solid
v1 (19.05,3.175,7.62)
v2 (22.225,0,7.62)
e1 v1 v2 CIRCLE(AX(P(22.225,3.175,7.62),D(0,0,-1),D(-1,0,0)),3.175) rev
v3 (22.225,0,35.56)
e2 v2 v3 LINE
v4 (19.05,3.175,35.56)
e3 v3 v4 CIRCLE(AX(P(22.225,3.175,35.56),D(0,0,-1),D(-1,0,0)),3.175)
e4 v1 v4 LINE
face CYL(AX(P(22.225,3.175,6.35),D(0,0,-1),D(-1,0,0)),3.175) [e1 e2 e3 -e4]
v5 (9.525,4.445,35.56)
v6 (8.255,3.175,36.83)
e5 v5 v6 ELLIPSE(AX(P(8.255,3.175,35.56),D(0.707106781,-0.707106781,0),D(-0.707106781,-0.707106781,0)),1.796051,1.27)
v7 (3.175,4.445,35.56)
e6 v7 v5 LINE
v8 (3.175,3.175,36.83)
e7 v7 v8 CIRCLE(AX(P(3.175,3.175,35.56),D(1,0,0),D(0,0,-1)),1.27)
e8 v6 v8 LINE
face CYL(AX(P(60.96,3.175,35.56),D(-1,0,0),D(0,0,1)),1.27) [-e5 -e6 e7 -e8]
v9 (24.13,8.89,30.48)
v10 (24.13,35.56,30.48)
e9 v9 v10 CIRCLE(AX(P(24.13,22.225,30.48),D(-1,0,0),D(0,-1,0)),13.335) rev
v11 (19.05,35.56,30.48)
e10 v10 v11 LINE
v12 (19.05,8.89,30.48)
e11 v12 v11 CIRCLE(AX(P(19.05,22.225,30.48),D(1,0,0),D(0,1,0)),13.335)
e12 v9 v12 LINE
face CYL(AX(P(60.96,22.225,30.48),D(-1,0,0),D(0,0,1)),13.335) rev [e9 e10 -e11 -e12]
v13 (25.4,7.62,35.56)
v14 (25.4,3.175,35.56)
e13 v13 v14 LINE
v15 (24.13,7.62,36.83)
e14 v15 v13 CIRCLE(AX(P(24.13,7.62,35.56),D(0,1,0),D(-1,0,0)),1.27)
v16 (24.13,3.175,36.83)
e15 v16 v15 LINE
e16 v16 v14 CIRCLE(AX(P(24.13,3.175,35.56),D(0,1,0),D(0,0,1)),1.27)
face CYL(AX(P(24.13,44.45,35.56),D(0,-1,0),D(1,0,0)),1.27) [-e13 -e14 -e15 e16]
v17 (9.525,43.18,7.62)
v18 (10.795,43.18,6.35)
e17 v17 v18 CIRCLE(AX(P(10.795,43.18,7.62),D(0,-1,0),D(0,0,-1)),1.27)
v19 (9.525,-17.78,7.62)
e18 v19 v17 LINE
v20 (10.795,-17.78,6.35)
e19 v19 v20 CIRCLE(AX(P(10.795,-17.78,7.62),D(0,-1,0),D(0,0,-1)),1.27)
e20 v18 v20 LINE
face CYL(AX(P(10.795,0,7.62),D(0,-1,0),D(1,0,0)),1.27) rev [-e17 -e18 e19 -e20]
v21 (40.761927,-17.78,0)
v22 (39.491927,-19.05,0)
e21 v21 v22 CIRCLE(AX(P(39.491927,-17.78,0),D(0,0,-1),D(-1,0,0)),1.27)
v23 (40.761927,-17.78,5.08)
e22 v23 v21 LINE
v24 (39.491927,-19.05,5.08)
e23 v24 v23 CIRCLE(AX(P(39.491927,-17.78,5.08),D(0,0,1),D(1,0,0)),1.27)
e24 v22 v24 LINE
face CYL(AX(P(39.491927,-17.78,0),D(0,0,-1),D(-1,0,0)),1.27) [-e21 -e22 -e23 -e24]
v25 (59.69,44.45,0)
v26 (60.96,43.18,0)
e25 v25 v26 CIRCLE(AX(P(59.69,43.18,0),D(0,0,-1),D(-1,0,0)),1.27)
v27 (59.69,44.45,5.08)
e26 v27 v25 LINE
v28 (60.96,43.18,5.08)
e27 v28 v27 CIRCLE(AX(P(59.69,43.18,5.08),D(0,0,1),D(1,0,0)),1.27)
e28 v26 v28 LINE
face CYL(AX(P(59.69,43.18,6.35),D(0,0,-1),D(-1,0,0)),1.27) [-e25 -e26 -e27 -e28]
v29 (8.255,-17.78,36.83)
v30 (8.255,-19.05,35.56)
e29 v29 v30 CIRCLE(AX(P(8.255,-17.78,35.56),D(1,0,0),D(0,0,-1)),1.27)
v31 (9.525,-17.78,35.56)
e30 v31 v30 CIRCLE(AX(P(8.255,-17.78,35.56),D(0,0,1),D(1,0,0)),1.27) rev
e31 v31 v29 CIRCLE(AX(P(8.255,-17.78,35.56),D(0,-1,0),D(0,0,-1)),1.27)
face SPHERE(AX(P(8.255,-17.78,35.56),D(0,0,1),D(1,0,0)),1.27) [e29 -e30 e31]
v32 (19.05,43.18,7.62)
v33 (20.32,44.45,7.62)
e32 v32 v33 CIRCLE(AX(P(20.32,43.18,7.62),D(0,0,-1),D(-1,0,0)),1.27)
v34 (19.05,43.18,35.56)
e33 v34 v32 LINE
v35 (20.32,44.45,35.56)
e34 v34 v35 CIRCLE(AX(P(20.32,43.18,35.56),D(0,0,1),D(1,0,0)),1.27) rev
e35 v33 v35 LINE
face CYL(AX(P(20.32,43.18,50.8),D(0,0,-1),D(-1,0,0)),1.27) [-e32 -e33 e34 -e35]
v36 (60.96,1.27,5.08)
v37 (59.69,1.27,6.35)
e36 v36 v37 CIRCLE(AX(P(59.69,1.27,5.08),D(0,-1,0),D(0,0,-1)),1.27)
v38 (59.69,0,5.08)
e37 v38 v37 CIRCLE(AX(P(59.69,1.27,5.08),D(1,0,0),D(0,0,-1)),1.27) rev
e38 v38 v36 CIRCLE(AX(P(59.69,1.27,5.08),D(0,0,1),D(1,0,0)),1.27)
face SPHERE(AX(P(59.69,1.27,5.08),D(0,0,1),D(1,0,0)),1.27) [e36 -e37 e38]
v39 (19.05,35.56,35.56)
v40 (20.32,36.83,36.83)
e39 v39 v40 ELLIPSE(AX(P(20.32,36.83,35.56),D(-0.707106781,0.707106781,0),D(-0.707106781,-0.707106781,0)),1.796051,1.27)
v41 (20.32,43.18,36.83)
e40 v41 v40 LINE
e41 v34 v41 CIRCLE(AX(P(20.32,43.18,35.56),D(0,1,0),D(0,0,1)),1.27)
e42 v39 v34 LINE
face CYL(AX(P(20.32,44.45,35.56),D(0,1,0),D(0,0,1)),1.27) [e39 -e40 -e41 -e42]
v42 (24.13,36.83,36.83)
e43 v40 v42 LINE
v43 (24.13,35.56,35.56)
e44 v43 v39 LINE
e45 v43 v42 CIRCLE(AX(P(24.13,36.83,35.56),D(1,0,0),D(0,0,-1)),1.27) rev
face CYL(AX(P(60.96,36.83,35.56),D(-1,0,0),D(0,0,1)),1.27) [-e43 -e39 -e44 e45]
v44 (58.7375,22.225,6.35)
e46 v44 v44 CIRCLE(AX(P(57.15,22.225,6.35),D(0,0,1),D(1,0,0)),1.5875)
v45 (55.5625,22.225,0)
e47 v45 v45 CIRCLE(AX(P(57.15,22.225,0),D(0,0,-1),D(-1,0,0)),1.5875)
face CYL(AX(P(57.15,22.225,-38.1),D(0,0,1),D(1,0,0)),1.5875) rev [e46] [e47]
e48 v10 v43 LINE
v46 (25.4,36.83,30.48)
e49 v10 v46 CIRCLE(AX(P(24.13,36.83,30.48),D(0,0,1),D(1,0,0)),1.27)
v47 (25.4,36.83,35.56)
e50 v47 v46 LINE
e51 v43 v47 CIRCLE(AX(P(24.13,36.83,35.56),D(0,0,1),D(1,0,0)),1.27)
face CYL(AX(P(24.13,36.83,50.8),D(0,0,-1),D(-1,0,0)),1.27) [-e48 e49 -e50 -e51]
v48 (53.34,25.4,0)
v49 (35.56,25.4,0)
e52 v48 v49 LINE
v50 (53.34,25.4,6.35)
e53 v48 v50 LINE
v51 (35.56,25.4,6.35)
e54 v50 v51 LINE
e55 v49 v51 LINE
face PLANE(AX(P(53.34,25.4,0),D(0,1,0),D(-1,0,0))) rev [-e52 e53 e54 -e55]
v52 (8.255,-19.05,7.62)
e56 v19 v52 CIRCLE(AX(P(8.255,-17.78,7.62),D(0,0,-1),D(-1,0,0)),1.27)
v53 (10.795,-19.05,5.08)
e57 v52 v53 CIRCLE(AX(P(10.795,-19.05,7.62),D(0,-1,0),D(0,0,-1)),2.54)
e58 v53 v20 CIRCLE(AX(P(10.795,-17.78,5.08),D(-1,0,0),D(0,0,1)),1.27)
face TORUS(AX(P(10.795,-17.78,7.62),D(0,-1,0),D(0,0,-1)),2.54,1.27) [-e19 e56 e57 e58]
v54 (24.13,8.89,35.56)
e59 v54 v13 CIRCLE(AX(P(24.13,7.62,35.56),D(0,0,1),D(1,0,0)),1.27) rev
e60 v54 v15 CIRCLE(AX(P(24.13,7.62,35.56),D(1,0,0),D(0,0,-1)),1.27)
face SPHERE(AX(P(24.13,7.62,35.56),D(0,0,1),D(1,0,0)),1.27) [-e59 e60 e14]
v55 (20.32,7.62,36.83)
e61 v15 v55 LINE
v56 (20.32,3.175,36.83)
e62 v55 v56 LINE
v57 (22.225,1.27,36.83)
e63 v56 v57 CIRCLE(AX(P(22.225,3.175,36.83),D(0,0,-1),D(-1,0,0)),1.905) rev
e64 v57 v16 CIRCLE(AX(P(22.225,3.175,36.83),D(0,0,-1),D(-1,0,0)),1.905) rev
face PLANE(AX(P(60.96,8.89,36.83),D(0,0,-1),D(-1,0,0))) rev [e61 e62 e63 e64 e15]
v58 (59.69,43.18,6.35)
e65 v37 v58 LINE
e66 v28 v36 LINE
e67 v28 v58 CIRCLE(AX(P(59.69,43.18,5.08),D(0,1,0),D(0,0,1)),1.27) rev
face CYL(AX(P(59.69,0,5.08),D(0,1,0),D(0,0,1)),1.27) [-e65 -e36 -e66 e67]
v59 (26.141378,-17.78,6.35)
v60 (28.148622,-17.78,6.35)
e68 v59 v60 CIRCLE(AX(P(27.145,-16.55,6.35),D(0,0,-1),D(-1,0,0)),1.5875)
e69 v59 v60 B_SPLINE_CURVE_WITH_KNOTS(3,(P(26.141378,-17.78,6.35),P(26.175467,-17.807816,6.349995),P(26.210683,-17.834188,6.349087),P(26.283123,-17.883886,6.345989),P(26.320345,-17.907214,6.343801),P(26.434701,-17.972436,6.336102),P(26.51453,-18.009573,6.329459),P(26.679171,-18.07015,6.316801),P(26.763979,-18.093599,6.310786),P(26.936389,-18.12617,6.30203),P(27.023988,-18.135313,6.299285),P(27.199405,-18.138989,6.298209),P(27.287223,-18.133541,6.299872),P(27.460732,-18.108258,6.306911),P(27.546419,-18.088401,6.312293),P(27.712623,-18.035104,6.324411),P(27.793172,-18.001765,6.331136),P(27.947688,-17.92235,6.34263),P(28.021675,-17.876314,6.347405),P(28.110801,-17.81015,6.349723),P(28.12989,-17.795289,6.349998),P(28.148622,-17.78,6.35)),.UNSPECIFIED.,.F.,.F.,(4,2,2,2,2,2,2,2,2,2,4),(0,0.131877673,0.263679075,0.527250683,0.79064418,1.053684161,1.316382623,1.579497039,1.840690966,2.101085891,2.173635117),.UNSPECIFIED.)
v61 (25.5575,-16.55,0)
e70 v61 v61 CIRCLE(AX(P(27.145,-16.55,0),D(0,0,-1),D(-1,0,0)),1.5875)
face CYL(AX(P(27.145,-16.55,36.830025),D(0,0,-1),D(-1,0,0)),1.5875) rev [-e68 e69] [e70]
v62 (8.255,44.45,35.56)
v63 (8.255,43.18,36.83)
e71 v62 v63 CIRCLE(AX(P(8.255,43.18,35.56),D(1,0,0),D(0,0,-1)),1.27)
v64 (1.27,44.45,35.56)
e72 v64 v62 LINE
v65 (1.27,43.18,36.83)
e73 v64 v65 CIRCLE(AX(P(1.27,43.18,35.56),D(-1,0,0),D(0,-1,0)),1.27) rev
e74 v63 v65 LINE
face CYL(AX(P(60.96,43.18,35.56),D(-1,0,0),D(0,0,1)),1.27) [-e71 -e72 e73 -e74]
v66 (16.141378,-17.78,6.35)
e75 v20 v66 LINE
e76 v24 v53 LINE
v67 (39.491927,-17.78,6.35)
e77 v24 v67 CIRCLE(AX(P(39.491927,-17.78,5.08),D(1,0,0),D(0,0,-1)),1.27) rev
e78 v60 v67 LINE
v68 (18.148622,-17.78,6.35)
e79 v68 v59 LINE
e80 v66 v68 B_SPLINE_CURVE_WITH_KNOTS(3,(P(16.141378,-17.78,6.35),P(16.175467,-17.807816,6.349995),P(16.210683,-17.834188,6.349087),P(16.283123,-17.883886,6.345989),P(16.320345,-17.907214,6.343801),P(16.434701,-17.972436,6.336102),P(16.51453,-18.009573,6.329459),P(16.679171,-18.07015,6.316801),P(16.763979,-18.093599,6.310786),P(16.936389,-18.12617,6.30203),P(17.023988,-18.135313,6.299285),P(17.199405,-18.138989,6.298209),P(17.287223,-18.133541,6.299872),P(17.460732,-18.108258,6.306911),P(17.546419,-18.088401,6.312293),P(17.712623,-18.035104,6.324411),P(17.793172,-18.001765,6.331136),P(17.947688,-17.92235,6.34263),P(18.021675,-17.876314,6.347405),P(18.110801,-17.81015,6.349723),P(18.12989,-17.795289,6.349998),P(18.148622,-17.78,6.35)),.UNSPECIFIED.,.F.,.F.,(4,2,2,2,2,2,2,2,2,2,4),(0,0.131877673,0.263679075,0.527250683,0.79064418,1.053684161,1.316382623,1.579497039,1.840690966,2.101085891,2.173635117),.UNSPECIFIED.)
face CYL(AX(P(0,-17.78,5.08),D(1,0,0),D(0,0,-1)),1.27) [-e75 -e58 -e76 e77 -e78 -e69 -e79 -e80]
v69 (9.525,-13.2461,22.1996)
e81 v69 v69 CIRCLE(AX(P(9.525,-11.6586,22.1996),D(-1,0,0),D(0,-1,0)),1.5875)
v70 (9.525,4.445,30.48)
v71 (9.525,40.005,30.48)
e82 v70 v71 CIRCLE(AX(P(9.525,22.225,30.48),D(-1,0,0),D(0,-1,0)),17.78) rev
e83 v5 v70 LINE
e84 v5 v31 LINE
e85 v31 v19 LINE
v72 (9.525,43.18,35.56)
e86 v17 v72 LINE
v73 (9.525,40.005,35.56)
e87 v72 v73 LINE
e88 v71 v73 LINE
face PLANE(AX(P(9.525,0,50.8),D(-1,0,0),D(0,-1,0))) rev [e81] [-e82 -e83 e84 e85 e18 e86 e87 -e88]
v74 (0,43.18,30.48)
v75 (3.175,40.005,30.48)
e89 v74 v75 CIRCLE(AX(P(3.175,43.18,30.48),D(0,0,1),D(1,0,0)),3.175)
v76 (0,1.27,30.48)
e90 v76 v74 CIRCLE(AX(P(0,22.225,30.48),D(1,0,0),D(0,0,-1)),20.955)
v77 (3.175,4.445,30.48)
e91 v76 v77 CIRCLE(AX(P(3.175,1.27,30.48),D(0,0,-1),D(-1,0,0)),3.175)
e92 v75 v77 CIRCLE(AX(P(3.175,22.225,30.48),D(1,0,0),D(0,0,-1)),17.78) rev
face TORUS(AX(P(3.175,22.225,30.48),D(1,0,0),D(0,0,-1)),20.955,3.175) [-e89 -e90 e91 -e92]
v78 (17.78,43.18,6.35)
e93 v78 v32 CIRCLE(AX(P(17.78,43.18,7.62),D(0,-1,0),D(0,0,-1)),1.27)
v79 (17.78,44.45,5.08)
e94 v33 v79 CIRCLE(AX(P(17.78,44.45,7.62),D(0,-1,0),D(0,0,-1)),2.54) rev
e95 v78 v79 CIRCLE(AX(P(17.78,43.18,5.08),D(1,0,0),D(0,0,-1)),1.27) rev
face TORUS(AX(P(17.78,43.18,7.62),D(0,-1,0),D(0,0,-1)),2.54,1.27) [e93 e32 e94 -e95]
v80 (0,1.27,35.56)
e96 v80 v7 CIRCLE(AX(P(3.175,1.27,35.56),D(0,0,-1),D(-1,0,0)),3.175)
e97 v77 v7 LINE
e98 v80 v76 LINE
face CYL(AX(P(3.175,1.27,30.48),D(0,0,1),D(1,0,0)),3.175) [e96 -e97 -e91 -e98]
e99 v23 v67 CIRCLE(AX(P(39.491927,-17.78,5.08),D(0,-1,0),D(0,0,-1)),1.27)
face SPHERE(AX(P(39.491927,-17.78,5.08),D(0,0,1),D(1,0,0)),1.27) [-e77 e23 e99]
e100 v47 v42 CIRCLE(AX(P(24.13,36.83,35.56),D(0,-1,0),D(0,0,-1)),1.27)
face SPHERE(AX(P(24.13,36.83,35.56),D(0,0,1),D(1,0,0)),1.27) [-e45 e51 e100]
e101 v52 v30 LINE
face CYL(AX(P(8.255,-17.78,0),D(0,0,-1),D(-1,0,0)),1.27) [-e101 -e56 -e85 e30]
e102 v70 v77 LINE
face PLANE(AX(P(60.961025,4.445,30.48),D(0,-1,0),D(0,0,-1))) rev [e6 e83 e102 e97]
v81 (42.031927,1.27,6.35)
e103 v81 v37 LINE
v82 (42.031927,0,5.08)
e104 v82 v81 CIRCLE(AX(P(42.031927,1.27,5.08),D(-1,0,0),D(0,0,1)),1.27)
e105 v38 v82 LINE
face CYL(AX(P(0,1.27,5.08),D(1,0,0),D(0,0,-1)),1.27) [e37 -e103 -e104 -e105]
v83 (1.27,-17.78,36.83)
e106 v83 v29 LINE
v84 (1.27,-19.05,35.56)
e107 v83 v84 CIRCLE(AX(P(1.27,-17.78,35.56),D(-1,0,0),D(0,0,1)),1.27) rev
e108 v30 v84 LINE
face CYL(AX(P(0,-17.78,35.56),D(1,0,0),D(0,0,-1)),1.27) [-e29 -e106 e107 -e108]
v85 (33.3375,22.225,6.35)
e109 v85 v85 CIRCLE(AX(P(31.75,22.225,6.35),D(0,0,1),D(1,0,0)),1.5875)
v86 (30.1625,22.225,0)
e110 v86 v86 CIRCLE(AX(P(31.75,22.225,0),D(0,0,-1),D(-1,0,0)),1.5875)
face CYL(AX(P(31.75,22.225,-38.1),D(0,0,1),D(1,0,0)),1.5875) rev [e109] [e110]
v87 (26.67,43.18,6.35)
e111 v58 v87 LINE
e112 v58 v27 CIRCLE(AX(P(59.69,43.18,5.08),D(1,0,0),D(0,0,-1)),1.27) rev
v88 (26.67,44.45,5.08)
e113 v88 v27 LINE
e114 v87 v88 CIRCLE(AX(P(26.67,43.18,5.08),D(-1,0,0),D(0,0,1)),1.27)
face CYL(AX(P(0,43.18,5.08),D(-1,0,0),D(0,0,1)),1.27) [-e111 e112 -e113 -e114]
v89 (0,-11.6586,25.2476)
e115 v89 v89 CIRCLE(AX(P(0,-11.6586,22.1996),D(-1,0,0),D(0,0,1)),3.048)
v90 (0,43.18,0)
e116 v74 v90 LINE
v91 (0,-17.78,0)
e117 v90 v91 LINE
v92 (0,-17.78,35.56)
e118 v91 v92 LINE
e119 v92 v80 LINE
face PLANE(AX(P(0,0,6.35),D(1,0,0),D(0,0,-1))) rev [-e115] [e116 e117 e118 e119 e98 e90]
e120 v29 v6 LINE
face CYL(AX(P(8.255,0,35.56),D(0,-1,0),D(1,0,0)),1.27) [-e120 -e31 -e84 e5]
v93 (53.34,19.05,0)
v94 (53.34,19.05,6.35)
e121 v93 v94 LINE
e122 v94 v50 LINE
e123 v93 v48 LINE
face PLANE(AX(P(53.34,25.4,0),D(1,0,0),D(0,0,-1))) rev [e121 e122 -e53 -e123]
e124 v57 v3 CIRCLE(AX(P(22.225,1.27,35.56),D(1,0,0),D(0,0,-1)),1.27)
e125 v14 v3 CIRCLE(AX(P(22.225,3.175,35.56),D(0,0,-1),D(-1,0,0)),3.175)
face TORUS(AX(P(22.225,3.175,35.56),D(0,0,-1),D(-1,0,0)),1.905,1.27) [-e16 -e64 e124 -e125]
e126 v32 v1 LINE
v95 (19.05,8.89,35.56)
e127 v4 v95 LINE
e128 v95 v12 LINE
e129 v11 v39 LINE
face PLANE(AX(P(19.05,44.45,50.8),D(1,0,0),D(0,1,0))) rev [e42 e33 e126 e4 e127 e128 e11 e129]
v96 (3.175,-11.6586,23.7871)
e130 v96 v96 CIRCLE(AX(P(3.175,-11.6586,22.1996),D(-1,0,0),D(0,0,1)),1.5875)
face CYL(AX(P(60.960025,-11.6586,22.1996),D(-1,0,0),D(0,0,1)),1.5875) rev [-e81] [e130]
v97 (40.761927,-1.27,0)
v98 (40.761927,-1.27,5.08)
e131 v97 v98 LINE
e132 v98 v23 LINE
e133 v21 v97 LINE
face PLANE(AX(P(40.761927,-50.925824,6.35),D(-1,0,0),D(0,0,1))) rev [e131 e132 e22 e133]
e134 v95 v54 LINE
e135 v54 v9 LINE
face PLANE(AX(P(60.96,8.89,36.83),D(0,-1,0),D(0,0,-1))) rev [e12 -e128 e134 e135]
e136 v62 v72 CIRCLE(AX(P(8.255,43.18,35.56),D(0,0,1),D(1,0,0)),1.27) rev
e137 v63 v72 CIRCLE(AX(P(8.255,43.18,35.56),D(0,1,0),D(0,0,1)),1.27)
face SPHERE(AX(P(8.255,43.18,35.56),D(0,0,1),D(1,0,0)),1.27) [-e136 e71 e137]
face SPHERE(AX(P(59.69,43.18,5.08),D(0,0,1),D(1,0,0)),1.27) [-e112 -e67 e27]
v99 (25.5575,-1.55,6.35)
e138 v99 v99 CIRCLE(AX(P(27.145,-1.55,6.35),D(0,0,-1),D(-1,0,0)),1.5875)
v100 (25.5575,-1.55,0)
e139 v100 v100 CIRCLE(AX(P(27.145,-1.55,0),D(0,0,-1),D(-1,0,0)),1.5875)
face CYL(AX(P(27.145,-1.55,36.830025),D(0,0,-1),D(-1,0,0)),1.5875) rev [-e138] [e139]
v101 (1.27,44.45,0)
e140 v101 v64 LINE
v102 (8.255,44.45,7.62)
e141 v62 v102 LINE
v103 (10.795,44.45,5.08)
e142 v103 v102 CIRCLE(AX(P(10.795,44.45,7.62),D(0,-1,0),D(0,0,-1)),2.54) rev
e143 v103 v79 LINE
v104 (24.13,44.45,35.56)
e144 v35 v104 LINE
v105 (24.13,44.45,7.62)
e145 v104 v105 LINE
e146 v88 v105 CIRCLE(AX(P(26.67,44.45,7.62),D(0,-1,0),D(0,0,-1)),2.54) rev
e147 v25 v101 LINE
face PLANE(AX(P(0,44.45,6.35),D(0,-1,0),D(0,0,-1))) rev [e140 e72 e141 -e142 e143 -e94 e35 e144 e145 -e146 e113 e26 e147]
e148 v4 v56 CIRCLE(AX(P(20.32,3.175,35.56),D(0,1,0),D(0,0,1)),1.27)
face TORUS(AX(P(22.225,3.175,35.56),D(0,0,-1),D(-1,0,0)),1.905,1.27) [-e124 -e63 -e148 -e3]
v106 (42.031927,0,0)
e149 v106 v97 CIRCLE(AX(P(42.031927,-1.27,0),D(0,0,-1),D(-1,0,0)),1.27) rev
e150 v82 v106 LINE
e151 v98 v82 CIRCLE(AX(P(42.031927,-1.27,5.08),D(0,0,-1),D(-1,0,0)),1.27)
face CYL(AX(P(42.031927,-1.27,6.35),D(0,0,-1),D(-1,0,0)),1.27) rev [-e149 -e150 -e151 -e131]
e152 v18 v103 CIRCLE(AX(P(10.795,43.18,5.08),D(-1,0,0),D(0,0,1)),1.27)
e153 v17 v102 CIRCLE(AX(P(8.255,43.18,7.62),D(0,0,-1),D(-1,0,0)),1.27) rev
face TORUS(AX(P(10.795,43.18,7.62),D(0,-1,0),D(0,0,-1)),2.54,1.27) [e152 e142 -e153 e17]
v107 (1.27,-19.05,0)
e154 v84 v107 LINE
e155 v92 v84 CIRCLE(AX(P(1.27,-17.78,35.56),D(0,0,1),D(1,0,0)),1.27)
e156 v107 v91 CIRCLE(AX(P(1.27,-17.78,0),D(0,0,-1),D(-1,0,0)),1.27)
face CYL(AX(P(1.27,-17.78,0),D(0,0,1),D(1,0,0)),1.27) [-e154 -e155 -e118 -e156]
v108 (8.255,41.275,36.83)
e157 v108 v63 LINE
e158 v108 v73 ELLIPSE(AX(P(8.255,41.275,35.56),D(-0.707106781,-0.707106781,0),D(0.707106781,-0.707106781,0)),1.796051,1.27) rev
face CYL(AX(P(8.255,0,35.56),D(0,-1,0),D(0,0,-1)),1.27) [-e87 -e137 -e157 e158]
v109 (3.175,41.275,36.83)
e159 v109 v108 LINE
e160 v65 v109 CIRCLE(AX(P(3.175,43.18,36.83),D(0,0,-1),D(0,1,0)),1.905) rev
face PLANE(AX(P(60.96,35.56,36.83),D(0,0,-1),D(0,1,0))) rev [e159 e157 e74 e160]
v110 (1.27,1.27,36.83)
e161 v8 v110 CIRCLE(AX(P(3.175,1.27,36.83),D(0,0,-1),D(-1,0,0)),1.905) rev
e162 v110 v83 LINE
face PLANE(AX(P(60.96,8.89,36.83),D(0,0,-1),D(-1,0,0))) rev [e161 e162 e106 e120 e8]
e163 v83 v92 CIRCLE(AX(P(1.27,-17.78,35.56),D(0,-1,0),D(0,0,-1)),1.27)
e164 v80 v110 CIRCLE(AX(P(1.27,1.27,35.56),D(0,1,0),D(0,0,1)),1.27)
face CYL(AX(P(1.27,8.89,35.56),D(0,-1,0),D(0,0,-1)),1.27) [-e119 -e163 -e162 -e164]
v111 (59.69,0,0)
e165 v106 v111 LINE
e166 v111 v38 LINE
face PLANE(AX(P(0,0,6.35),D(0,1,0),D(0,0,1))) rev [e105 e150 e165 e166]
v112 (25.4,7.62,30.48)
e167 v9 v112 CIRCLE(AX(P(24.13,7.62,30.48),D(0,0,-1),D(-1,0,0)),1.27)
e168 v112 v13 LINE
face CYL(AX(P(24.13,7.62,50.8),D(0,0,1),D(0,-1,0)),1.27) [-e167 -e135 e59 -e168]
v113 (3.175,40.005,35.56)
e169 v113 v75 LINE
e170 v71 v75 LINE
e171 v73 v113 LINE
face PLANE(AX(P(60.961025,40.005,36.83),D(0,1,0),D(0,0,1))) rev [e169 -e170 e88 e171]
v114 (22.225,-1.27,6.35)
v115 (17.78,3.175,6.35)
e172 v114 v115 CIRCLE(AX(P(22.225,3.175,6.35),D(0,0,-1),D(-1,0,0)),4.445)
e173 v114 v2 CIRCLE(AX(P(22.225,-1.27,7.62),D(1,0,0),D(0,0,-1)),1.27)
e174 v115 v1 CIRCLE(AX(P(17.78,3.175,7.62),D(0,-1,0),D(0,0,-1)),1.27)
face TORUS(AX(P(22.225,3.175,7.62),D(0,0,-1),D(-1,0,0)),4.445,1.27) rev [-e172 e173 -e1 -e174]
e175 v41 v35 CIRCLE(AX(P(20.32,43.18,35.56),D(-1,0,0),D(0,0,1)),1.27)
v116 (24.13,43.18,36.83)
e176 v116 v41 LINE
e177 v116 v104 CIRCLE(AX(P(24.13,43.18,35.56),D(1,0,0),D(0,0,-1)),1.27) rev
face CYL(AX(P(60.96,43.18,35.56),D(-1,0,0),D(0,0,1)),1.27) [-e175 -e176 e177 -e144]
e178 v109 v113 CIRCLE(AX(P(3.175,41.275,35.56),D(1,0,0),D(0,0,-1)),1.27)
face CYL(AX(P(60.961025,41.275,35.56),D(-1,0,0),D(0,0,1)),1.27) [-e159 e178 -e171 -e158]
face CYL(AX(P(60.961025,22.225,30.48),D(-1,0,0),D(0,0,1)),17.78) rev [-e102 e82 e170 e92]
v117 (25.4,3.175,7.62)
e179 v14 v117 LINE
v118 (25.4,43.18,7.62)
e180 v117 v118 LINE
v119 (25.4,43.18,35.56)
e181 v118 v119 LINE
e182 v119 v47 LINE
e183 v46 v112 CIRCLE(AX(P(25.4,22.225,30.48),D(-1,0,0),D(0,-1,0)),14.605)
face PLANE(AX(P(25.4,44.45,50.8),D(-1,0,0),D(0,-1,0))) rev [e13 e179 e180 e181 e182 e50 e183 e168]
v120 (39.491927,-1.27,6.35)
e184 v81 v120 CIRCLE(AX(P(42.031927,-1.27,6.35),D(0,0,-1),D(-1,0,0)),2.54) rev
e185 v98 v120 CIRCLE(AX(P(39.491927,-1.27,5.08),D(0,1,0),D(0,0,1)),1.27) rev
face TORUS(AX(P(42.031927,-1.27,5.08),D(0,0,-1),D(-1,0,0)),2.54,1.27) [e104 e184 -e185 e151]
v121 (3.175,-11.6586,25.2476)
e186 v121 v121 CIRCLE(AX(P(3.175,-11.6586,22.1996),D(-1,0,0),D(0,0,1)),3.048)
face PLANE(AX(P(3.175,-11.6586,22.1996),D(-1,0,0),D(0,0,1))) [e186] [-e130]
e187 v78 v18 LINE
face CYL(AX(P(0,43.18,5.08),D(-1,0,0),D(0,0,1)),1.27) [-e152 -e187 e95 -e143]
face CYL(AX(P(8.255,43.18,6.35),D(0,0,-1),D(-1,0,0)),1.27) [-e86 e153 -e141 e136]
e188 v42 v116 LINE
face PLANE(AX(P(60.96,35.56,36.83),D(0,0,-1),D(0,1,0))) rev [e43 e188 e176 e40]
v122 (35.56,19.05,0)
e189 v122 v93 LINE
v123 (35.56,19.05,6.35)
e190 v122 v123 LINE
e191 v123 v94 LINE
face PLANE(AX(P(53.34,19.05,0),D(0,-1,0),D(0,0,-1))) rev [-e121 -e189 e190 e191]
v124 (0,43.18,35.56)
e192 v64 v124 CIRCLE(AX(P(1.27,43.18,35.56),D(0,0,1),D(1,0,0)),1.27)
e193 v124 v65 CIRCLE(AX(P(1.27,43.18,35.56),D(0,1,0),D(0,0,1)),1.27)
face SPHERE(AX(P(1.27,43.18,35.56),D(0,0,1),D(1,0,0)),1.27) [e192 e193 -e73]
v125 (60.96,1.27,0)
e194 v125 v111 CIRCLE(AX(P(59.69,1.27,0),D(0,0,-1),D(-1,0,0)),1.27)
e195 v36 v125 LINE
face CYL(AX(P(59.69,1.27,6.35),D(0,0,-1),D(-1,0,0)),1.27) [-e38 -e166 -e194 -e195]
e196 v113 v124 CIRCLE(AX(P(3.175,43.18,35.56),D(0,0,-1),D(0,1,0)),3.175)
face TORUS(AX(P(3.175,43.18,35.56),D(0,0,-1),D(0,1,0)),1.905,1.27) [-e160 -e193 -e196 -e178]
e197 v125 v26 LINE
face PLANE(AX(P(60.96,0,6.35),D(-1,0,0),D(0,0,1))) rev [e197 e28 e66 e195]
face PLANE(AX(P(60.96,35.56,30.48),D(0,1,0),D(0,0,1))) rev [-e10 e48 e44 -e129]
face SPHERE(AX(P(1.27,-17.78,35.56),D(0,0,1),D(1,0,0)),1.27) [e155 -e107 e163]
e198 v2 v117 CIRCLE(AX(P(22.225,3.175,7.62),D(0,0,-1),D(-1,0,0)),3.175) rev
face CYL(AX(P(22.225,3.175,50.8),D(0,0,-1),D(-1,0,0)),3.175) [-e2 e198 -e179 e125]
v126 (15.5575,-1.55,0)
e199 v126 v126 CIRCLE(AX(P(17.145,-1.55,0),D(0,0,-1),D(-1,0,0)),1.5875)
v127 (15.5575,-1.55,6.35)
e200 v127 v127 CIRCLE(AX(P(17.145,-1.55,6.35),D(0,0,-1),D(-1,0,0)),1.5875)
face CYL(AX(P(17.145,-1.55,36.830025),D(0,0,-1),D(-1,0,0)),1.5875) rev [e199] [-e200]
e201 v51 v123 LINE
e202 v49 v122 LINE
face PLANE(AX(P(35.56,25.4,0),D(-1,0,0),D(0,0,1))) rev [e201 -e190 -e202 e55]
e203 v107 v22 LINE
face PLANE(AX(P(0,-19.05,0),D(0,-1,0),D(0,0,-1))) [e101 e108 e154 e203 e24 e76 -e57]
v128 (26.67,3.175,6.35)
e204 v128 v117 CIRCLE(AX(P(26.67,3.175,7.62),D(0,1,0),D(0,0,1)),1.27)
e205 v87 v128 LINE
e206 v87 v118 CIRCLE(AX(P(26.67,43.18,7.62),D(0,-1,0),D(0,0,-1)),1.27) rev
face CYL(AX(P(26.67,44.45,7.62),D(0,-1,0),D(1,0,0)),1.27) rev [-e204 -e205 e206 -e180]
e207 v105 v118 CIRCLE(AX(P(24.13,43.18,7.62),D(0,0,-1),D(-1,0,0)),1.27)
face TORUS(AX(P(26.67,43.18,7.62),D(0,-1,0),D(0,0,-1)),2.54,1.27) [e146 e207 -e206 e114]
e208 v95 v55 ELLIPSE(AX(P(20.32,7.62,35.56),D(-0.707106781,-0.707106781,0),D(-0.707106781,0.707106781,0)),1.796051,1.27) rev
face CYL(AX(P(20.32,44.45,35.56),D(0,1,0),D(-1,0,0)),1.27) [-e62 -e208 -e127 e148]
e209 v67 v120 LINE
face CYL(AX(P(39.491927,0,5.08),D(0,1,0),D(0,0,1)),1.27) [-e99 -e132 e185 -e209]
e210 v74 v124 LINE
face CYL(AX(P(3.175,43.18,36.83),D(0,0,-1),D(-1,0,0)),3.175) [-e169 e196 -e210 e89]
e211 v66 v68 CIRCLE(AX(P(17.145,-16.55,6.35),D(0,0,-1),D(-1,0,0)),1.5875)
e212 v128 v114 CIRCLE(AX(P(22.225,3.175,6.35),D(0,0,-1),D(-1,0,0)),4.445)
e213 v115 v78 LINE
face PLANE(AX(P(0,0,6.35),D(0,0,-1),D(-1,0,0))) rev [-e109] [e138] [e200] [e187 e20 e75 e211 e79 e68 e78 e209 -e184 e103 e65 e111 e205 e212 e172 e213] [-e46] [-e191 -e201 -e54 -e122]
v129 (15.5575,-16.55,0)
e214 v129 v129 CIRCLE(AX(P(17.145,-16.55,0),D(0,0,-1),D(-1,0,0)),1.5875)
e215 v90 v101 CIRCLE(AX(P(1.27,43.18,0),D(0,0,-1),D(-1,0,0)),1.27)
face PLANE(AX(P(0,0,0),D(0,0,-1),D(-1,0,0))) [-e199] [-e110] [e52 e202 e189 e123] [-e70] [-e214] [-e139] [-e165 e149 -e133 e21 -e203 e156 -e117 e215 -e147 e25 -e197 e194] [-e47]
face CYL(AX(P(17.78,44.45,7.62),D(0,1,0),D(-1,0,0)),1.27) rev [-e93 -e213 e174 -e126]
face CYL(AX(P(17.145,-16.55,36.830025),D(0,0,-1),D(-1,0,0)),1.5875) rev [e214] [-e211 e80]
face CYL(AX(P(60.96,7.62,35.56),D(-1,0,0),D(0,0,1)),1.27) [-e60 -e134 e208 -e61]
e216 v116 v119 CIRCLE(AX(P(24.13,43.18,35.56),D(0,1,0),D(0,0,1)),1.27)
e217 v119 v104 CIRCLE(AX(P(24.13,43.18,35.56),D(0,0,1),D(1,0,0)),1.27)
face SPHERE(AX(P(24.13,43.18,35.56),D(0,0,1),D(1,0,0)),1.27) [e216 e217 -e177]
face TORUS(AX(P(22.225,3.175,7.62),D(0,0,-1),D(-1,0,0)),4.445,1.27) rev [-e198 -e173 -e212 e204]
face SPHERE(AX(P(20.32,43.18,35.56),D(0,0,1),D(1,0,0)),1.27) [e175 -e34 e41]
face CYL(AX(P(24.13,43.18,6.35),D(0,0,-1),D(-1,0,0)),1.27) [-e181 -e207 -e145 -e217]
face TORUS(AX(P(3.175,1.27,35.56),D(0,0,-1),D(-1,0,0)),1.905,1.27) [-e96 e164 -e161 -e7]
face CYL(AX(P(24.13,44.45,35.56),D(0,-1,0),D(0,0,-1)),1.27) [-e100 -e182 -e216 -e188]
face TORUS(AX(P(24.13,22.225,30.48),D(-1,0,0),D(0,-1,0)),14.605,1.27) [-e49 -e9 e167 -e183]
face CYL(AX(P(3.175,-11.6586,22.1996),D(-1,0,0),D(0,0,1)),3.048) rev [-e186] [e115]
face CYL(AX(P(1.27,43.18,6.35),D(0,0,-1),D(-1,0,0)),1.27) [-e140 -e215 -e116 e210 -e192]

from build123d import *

# Parameters (mm, degrees)
SKETCH1_W           = 60.96
SKETCH1_H           = 44.45
BOSS_EXTRUDE1_DEPTH = 6.35
SKETCH2_W           = 9.525
SKETCH2_H           = 44.45
SKETCH2_W_2         = 6.35
BOSS_EXTRUDE2_DEPTH = 44.45
CUT_EXTRUDE1_DEPTH  = 91.953637091
SKETCH4_R           = 1.5875
CUT_EXTRUDE2_DEPTH  = 44.45
SKETCH6_W           = 17.78
SKETCH6_H           = 6.35
CUT_EXTRUDE3_DEPTH  = 82.369247877
SKETCH7_W           = 9.525
SKETCH7_H           = 36.83
BOSS_EXTRUDE3_DEPTH = 19.05
SKETCH8_R           = 3.048
CUT_EXTRUDE4_DEPTH  = 3.175
SKETCH9_R           = 1.5875
CUT_EXTRUDE5_DEPTH  = 84.954588916
CUT_EXTRUDE6_REACH  = 85.955
SKETCH12_W          = 31.236927456
SKETCH12_H          = 6.35
BOSS_EXTRUDE4_DEPTH = 19.05
FILLET1_R           = 3.175
SKETCH11_R          = 1.5875
CUT_EXTRUDE7_DEPTH  = 84.954588916
FILLET3_R           = 3.175
FILLET4_R           = 1.27


# Some blends are built 0.0001 mm under size
with BuildPart() as part:
    # Sketch1 → Boss-Extrude1 (new body)
    with BuildSketch(Plane.XY):
        with Locations((30.48, 22.225)):
            Rectangle(SKETCH1_W, SKETCH1_H)
    extrude(amount=BOSS_EXTRUDE1_DEPTH)

    # Sketch2 → Boss-Extrude2 (add)
    with BuildSketch(Plane.XY.offset(6.35)):
        with Locations((4.7625, 22.225)):
            Rectangle(SKETCH2_W, SKETCH2_H)
        with Locations((22.225, 22.225)):
            Rectangle(SKETCH2_W_2, SKETCH2_H)
    extrude(amount=BOSS_EXTRUDE2_DEPTH)

    # Sketch3 → Cut-Extrude1 (cut, through all)
    with BuildSketch(Plane.ZY):
        with BuildLine():
            Line((30.48, 35.56), (36.83, 35.56))
            Line((36.83, 35.56), (36.83, 44.45))
            Line((36.83, 44.45), (50.8, 44.45))
            Line((50.8, 44.45), (50.8, 0))
            Line((50.8, 0), (36.83, 0))
            Line((36.83, 0), (36.83, 8.89))
            Line((36.83, 8.89), (30.48, 8.89))
            ThreePointArc((30.48, 8.89), (17.145, 22.225), (30.48, 35.56))
        make_face()
    extrude(amount=-CUT_EXTRUDE1_DEPTH, mode=Mode.SUBTRACT)

    # Sketch4 → Cut-Extrude2 (cut)
    with BuildSketch(Plane.XY.offset(6.35)):
        with Locations((57.15, 22.225)):
            Circle(SKETCH4_R)
        with Locations((31.75, 22.225)):
            Circle(SKETCH4_R)
    extrude(amount=-CUT_EXTRUDE2_DEPTH, mode=Mode.SUBTRACT)

    # Sketch6 → Cut-Extrude3 (cut, through all)
    with BuildSketch(Plane.XY.offset(6.35)):
        with Locations((44.45, 22.225)):
            Rectangle(SKETCH6_W, SKETCH6_H)
    extrude(amount=-CUT_EXTRUDE3_DEPTH, mode=Mode.SUBTRACT)

    # Sketch7 → Boss-Extrude3 (add)
    with BuildSketch(Plane.XZ):
        with Locations((4.7625, 18.415)):
            Rectangle(SKETCH7_W, SKETCH7_H)
    extrude(amount=BOSS_EXTRUDE3_DEPTH)

    # Sketch8 → Cut-Extrude4 (cut)
    with BuildSketch(Plane.ZY):
        with Locations((22.1996, -11.6586)):
            Circle(SKETCH8_R)
    extrude(amount=-CUT_EXTRUDE4_DEPTH, mode=Mode.SUBTRACT)

    # Sketch9 → Cut-Extrude5 (cut, through all)
    with BuildSketch(Plane.ZY):
        with Locations((22.1996, -11.6586)):
            Circle(SKETCH9_R)
    extrude(amount=-CUT_EXTRUDE5_DEPTH, mode=Mode.SUBTRACT)

    # Sketch10 → Cut-Extrude6 (cut, up to next)
    with BuildSketch(Plane.ZY, mode=Mode.PRIVATE) as cut_extrude6_sk1:
        with BuildLine():
            Line((30.48, 4.445), (36.83, 4.445))
            Line((36.83, 4.445), (36.83, 40.005))
            Line((36.83, 40.005), (30.48, 40.005))
            ThreePointArc((30.48, 40.005), (12.7, 22.225), (30.48, 4.445))
        make_face()
    cut_extrude6_tool1 = extrude(cut_extrude6_sk1.sketch, amount=-CUT_EXTRUDE6_REACH, mode=Mode.PRIVATE) & part.part
    add(cut_extrude6_tool1.solids().sort_by_distance((0, 22.225, 26.285194))[0], mode=Mode.SUBTRACT)

    # Sketch12 → Boss-Extrude4 (add)
    with BuildSketch(Plane.XZ):
        with Locations((25.143463728, 3.175)):
            Rectangle(SKETCH12_W, SKETCH12_H)
    extrude(amount=BOSS_EXTRUDE4_DEPTH)

    # Fillet1
    fillet1_edges = [part.edges().sort_by_distance(p)[0] for p in [
        (0, 40.005, 33.655),
        (0, 22.225, 12.7),
        (0, 4.445, 33.655),
    ]]
    fillet(fillet1_edges, radius=FILLET1_R)

    # Sketch11 → Cut-Extrude7 (cut, through all)
    with BuildSketch(Plane(origin=(0, 0, 0), x_dir=(-1, 0, 0), z_dir=(0, 0, -1))):
        with Locations((-27.145, -16.55)):
            Circle(SKETCH11_R)
        with Locations((-17.145, -16.55)):
            Circle(SKETCH11_R)
        with Locations((-17.145, -1.55)):
            Circle(SKETCH11_R)
        with Locations((-27.145, -1.55)):
            Circle(SKETCH11_R)
    extrude(amount=-CUT_EXTRUDE7_DEPTH, mode=Mode.SUBTRACT)

    # Fillet3
    fillet3_edges = [part.edges().sort_by_distance(p)[0] for p in [
        (19.05, 0, 21.59),
        (25.4, 0, 21.59),
    ]]
    fillet(fillet3_edges, radius=FILLET3_R - 0.0001)  # a hair under: the kernel refuses the full size

    # Fillet4
    # the kernel refuses this fillet: 1.27 mm, written as the material it adds along each edge
    with BuildSketch(Plane(origin=(19.05, 44.45, 6.35), x_dir=(-1, 0, 0), z_dir=(0, -1, 0)), Plane(origin=(25.4, 3.1749, 6.35), x_dir=(1, 0, 0), z_dir=(0, 1, 0))) as fillet4_piece_1:
        with BuildLine():
            CenterArc((FILLET4_R, -FILLET4_R), FILLET4_R, 90, 90)
            Line((0, -FILLET4_R), (0, 0))
            Line((0, 0), (FILLET4_R, 0))
        make_face()
    extrude(amount=41.2751)
    with BuildSketch(Plane(origin=(22.2249, 3.1749, 6.35), x_dir=(-1, 0, 0), z_dir=(0, 1, 0))) as fillet4_piece_2:
        with BuildLine():
            CenterArc((3.1749 + FILLET4_R, FILLET4_R), FILLET4_R, 180, 90)
            Line((3.1749, FILLET4_R), (3.1749, 0))
            Line((3.1749, 0), (3.1749 + FILLET4_R, 0))
        make_face()
    revolve(axis=Axis((22.2249, 3.1749, 6.35), (0, 0, 1)), revolution_arc=90)
    with BuildSketch(Plane(origin=(22.2251, 3.1749, 6.35), x_dir=(1, 0, 0), z_dir=(0, 1, 0))) as fillet4_piece_3:
        with BuildLine():
            CenterArc((3.1749 + FILLET4_R, -FILLET4_R), FILLET4_R, 90, 90)
            Line((3.1749, -FILLET4_R), (3.1749, 0))
            Line((3.1749, 0), (3.1749 + FILLET4_R, 0))
        make_face()
    revolve(axis=Axis((22.2251, 3.1749, 6.35), (0, 0, -1)), revolution_arc=90)
    with BuildSketch(Plane(origin=(40.761927456, 0, 6.35), x_dir=(1, 0, 0), z_dir=(0, 0, -1))) as fillet4_piece_4:
        with BuildLine():
            CenterArc((FILLET4_R, FILLET4_R), FILLET4_R, 180, 90)
            Line((0, FILLET4_R), (0, 0))
            Line((0, 0), (FILLET4_R, 0))
        make_face()
    extrude(amount=6.35)
    with BuildSketch(Plane(origin=(9.525, 44.45, 6.35), x_dir=(1, 0, 0), z_dir=(0, -1, 0))) as fillet4_piece_5:
        with BuildLine():
            CenterArc((FILLET4_R, FILLET4_R), FILLET4_R, 180, 90)
            Line((0, FILLET4_R), (0, 0))
            Line((0, 0), (FILLET4_R, 0))
        make_face()
    extrude(amount=63.5)
    with BuildSketch(Plane(origin=(22.2249, 0, 6.35), x_dir=(0, -1, 0), z_dir=(1, 0, 0))) as fillet4_piece_6:
        with BuildLine():
            CenterArc((FILLET4_R, -FILLET4_R), FILLET4_R, 90, 90)
            Line((0, -FILLET4_R), (0, 0))
            Line((0, 0), (FILLET4_R, 0))
        make_face()
    extrude(amount=0.0002)
    # the kernel refuses this fillet: 1.27 mm, written as the material it takes off along each edge
    with BuildSketch(Plane(origin=(24.13, 36.83, 35.56), x_dir=(0, 0, 1), z_dir=(0, -1, 0))) as fillet4_2_piece_1_section:
        Polygon((0, 0), (FILLET4_R, 0), (FILLET4_R, -FILLET4_R), (0, -FILLET4_R), align=None)
    fillet4_2_piece_1 = extrude(amount=FILLET4_R, mode=Mode.PRIVATE)
    fillet4_2_piece_1 = fillet4_2_piece_1 - Plane(origin=(24.13, 36.83, 35.56), x_dir=(-0.7071067811865475, 0, -0.7071067811865475), z_dir=(0, -1, 0)) * Sphere(FILLET4_R, mode=Mode.PRIVATE)
    add(fillet4_2_piece_1, mode=Mode.SUBTRACT)
    with BuildSketch(Plane(origin=(24.13, 7.62, 35.56), x_dir=(0, 0, 1), z_dir=(0, 1, 0))) as fillet4_2_piece_2_section:
        Polygon((0, 0), (FILLET4_R, 0), (FILLET4_R, FILLET4_R), (0, FILLET4_R), align=None)
    fillet4_2_piece_2 = extrude(amount=FILLET4_R, mode=Mode.PRIVATE)
    fillet4_2_piece_2 = fillet4_2_piece_2 - Plane(origin=(24.13, 7.62, 35.56), x_dir=(-0.7071067811865475, 0, -0.7071067811865475), z_dir=(0, 1, 0)) * Sphere(FILLET4_R, mode=Mode.PRIVATE)
    add(fillet4_2_piece_2, mode=Mode.SUBTRACT)
    with BuildSketch(Plane(origin=(1.27, 43.18, 35.56), x_dir=(0, 0, 1), z_dir=(-1, 0, 0))) as fillet4_2_piece_3_section:
        Polygon((0, 0), (FILLET4_R, 0), (FILLET4_R, FILLET4_R), (0, FILLET4_R), align=None)
    fillet4_2_piece_3 = extrude(amount=FILLET4_R, mode=Mode.PRIVATE)
    fillet4_2_piece_3 = fillet4_2_piece_3 - Plane(origin=(1.27, 43.18, 35.56), x_dir=(0, -0.7071067811865479, -0.7071067811865472), z_dir=(-1, 0, 0)) * Sphere(FILLET4_R, mode=Mode.PRIVATE)
    add(fillet4_2_piece_3, mode=Mode.SUBTRACT)
    with BuildSketch(Plane(origin=(1.27, -17.78, 35.56), x_dir=(0, 0, 1), z_dir=(-1, 0, 0))) as fillet4_2_piece_4_section:
        Polygon((0, 0), (FILLET4_R, 0), (FILLET4_R, -FILLET4_R), (0, -FILLET4_R), align=None)
    fillet4_2_piece_4 = extrude(amount=FILLET4_R, mode=Mode.PRIVATE)
    fillet4_2_piece_4 = fillet4_2_piece_4 - Plane(origin=(1.27, -17.78, 35.56), x_dir=(0, 0.7071067811865475, -0.7071067811865475), z_dir=(-1, 0, 0)) * Sphere(FILLET4_R, mode=Mode.PRIVATE)
    add(fillet4_2_piece_4, mode=Mode.SUBTRACT)
    with BuildSketch(Plane(origin=(19.05, 12.065, 36.83), x_dir=(0, 0, -1), z_dir=(0, -1, 0))) as fillet4_2_piece_5:
        with BuildLine():
            CenterArc((FILLET4_R, FILLET4_R), FILLET4_R, 180, 90)
            Line((0, FILLET4_R), (0, 0))
            Line((0, 0), (FILLET4_R, 0))
        make_face()
    extrude(amount=8.8901, mode=Mode.SUBTRACT)
    with BuildSketch(Plane(origin=(22.2249, 3.1749, 36.83), x_dir=(-1, 0, 0), z_dir=(0, 1, 0))) as fillet4_2_piece_6:
        with BuildLine():
            CenterArc((3.1749 - FILLET4_R, -FILLET4_R), FILLET4_R, 0, 90)
            Line((3.1749 - FILLET4_R, 0), (3.1749, 0))
            Line((3.1749, 0), (3.1749, -FILLET4_R))
        make_face()
    revolve(axis=Axis((22.2249, 3.1749, 36.83), (0, 0, 1)), revolution_arc=90, mode=Mode.SUBTRACT)
    with BuildSketch(Plane(origin=(22.2251, 3.1749, 36.83), x_dir=(1, 0, 0), z_dir=(0, 1, 0))) as fillet4_2_piece_7:
        with BuildLine():
            CenterArc((3.1749 - FILLET4_R, FILLET4_R), FILLET4_R, 270, 90)
            Line((3.1749 - FILLET4_R, 0), (3.1749, 0))
            Line((3.1749, 0), (3.1749, FILLET4_R))
        make_face()
    revolve(axis=Axis((22.2251, 3.1749, 36.83), (0, 0, -1)), revolution_arc=90, mode=Mode.SUBTRACT)
    with BuildSketch(Plane(origin=(25.4, 35.56, 30.48), x_dir=(0, 1, 0), z_dir=(0, 0, 1)), Plane(origin=(25.4, 8.89, 35.56), x_dir=(0, -1, 0), z_dir=(0, 0, -1))) as fillet4_2_piece_8:
        with BuildLine():
            CenterArc((FILLET4_R, FILLET4_R), FILLET4_R, 180, 90)
            Line((0, FILLET4_R), (0, 0))
            Line((0, 0), (FILLET4_R, 0))
        make_face()
    extrude(amount=5.08, mode=Mode.SUBTRACT)
    with BuildSketch(Plane(origin=(3.175, 40.005, 36.83), x_dir=(0, 1, 0), z_dir=(1, 0, 0))) as fillet4_2_piece_9:
        with BuildLine():
            CenterArc((FILLET4_R, -FILLET4_R), FILLET4_R, 90, 90)
            Line((0, -FILLET4_R), (0, 0))
            Line((0, 0), (FILLET4_R, 0))
        make_face()
    extrude(amount=9.525, mode=Mode.SUBTRACT)
    with BuildSketch(Plane(origin=(3.175, 43.18, 36.83), x_dir=(-1, 0, 0), z_dir=(0, 1, 0))) as fillet4_2_piece_10:
        with BuildLine():
            CenterArc((3.175 - FILLET4_R, -FILLET4_R), FILLET4_R, 0, 90)
            Line((3.175, -FILLET4_R), (3.175, 0))
            Line((3.175, 0), (3.175 - FILLET4_R, 0))
        make_face()
    revolve(axis=Axis((3.175, 43.18, 36.83), (0, 0, 1)), revolution_arc=90, mode=Mode.SUBTRACT)
    with BuildSketch(Plane(origin=(3.175, 4.445, 36.83), x_dir=(0, -1, 0), z_dir=(1, 0, 0))) as fillet4_2_piece_11:
        with BuildLine():
            CenterArc((FILLET4_R, FILLET4_R), FILLET4_R, 180, 90)
            Line((0, FILLET4_R), (0, 0))
            Line((0, 0), (FILLET4_R, 0))
        make_face()
    extrude(amount=9.525, mode=Mode.SUBTRACT)
    with BuildSketch(Plane(origin=(3.175, 1.27, 36.83), x_dir=(-1, 0, 0), z_dir=(0, -1, 0))) as fillet4_2_piece_12:
        with BuildLine():
            CenterArc((3.175 - FILLET4_R, FILLET4_R), FILLET4_R, 270, 90)
            Line((3.175, FILLET4_R), (3.175, 0))
            Line((3.175, 0), (3.175 - FILLET4_R, 0))
        make_face()
    revolve(axis=Axis((3.175, 1.27, 36.83), (0, 0, -1)), revolution_arc=90, mode=Mode.SUBTRACT)
    with BuildSketch(Plane(origin=(15.875, 8.89, 36.83), x_dir=(0, 0, -1), z_dir=(1, 0, 0)), Plane(origin=(15.875, 35.56, 36.83), x_dir=(0, 1, 0), z_dir=(1, 0, 0))) as fillet4_2_piece_13:
        with BuildLine():
            CenterArc((FILLET4_R, -FILLET4_R), FILLET4_R, 90, 90)
            Line((0, -FILLET4_R), (0, 0))
            Line((0, 0), (FILLET4_R, 0))
        make_face()
    extrude(amount=8.255, mode=Mode.SUBTRACT)
    with BuildSketch(Plane(origin=(40.761927456, -19.05, 9.525), x_dir=(0, 1, 0), z_dir=(0, 0, -1)), Plane(origin=(15.875, 44.45, 36.83), x_dir=(0, 0, -1), z_dir=(1, 0, 0))) as fillet4_2_piece_14:
        with BuildLine():
            CenterArc((FILLET4_R, -FILLET4_R), FILLET4_R, 90, 90)
            Line((0, -FILLET4_R), (0, 0))
            Line((0, 0), (FILLET4_R, 0))
        make_face()
    extrude(amount=12.7, mode=Mode.SUBTRACT)
    with BuildSketch(Plane(origin=(60.96, 0, -3.175), x_dir=(0, 1, 0), z_dir=(0, 0, 1)), Plane(origin=(60.96, 44.45, -3.175), x_dir=(-1, 0, 0), z_dir=(0, 0, 1))) as fillet4_2_piece_15:
        with BuildLine():
            CenterArc((FILLET4_R, FILLET4_R), FILLET4_R, 180, 90)
            Line((0, FILLET4_R), (0, 0))
            Line((0, 0), (FILLET4_R, 0))
        make_face()
    extrude(amount=12.7, mode=Mode.SUBTRACT)
    with BuildSketch(Plane(origin=(9.525, 36.83, 36.83), x_dir=(-1, 0, 0), z_dir=(0, 1, 0))) as fillet4_2_piece_16:
        with BuildLine():
            CenterArc((FILLET4_R, -FILLET4_R), FILLET4_R, 90, 90)
            Line((0, -FILLET4_R), (0, 0))
            Line((0, 0), (FILLET4_R, 0))
        make_face()
    extrude(amount=10.795, mode=Mode.SUBTRACT)
    with BuildSketch(Plane(origin=(9.525, 7.62, 36.83), x_dir=(0, 0, -1), z_dir=(0, -1, 0))) as fillet4_2_piece_17:
        with BuildLine():
            CenterArc((FILLET4_R, -FILLET4_R), FILLET4_R, 90, 90)
            Line((0, -FILLET4_R), (0, 0))
            Line((0, 0), (FILLET4_R, 0))
        make_face()
    extrude(amount=29.845, mode=Mode.SUBTRACT)
    with BuildSketch(Plane(origin=(25.4, 3.1749, 36.83), x_dir=(0, 0, -1), z_dir=(0, 1, 0))) as fillet4_2_piece_18:
        with BuildLine():
            CenterArc((FILLET4_R, FILLET4_R), FILLET4_R, 180, 90)
            Line((0, FILLET4_R), (0, 0))
            Line((0, 0), (FILLET4_R, 0))
        make_face()
    extrude(amount=4.4451, mode=Mode.SUBTRACT)
    with BuildSketch(Plane(origin=(25.4, 22.225, 30.48), x_dir=(0, 1, 0), z_dir=(0, 0, 1))) as fillet4_2_piece_19:
        with BuildLine():
            CenterArc((13.335 + FILLET4_R, FILLET4_R), FILLET4_R, 180, 90)
            Line((13.335, FILLET4_R), (13.335, 0))
            Line((13.335, 0), (13.335 + FILLET4_R, 0))
        make_face()
    revolve(axis=Axis((25.4, 22.225, 30.48), (-1, 0, 0)), revolution_arc=180, mode=Mode.SUBTRACT)
    with BuildSketch(Plane(origin=(19.05, 47.625, 36.83), x_dir=(0, 0, -1), z_dir=(0, -1, 0))) as fillet4_2_piece_20:
        with BuildLine():
            CenterArc((FILLET4_R, FILLET4_R), FILLET4_R, 180, 90)
            Line((0, FILLET4_R), (0, 0))
            Line((0, 0), (FILLET4_R, 0))
        make_face()
    extrude(amount=15.24, mode=Mode.SUBTRACT)
    with BuildSketch(Plane(origin=(25.4, 36.83, 36.83), x_dir=(0, 0, -1), z_dir=(0, 1, 0))) as fillet4_2_piece_21:
        with BuildLine():
            CenterArc((FILLET4_R, FILLET4_R), FILLET4_R, 180, 90)
            Line((0, FILLET4_R), (0, 0))
            Line((0, 0), (FILLET4_R, 0))
        make_face()
    extrude(amount=10.795, mode=Mode.SUBTRACT)
    with BuildSketch(Plane(origin=(0, 44.45, 35.56), x_dir=(1, 0, 0), z_dir=(0, 0, -1)), Plane(origin=(0, -19.05, -3.175), x_dir=(1, 0, 0), z_dir=(0, 0, 1))) as fillet4_2_piece_22:
        with BuildLine():
            CenterArc((FILLET4_R, FILLET4_R), FILLET4_R, 180, 90)
            Line((0, FILLET4_R), (0, 0))
            Line((0, 0), (FILLET4_R, 0))
        make_face()
    extrude(amount=38.735, mode=Mode.SUBTRACT)
    with BuildSketch(Plane(origin=(1.27, 44.45, 36.83), x_dir=(0, 0, -1), z_dir=(1, 0, 0))) as fillet4_2_piece_23:
        with BuildLine():
            CenterArc((FILLET4_R, -FILLET4_R), FILLET4_R, 90, 90)
            Line((0, -FILLET4_R), (0, 0))
            Line((0, 0), (FILLET4_R, 0))
        make_face()
    extrude(amount=11.43, mode=Mode.SUBTRACT)
    with BuildSketch(Plane(origin=(0, -17.78, 36.83), x_dir=(0, 0, -1), z_dir=(0, 1, 0))) as fillet4_2_piece_24:
        with BuildLine():
            CenterArc((FILLET4_R, -FILLET4_R), FILLET4_R, 90, 90)
            Line((0, -FILLET4_R), (0, 0))
            Line((0, 0), (FILLET4_R, 0))
        make_face()
    extrude(amount=19.05, mode=Mode.SUBTRACT)
    with BuildSketch(Plane(origin=(1.27, -19.05, 36.83), x_dir=(0, 0, -1), z_dir=(1, 0, 0))) as fillet4_2_piece_25:
        with BuildLine():
            CenterArc((FILLET4_R, FILLET4_R), FILLET4_R, 180, 90)
            Line((0, FILLET4_R), (0, 0))
            Line((0, 0), (FILLET4_R, 0))
        make_face()
    extrude(amount=11.43, mode=Mode.SUBTRACT)
    with BuildSketch(Plane(origin=(60.96, -3.175, 6.35), x_dir=(-1, 0, 0), z_dir=(0, 1, 0))) as fillet4_2_piece_26:
        with BuildLine():
            CenterArc((FILLET4_R, -FILLET4_R), FILLET4_R, 90, 90)
            Line((0, -FILLET4_R), (0, 0))
            Line((0, 0), (FILLET4_R, 0))
        make_face()
    extrude(amount=50.8, mode=Mode.SUBTRACT)
    with BuildSketch(Plane(origin=(22.2249, 0, 36.83), x_dir=(0, 0, -1), z_dir=(1, 0, 0))) as fillet4_2_piece_27:
        with BuildLine():
            CenterArc((FILLET4_R, FILLET4_R), FILLET4_R, 180, 90)
            Line((0, FILLET4_R), (0, 0))
            Line((0, 0), (FILLET4_R, 0))
        make_face()
    extrude(amount=0.0002, mode=Mode.SUBTRACT)
    # the kernel refuses this fillet: 1.27 mm, written as the material it takes off along each edge
    with BuildSketch(Plane(origin=(59.69, 1.27, 5.08), x_dir=(0, -1, 0), z_dir=(0, 0, 1))) as fillet4_3_piece_1_section:
        Polygon((0, 0), (FILLET4_R, 0), (FILLET4_R, FILLET4_R), (0, FILLET4_R), align=None)
    fillet4_3_piece_1 = extrude(amount=FILLET4_R, mode=Mode.PRIVATE)
    fillet4_3_piece_1 = fillet4_3_piece_1 - Plane(origin=(59.69, 1.27, 5.08), x_dir=(-0.7071067811865475, 0.7071067811865475, 0), z_dir=(0, 0, 1)) * Sphere(FILLET4_R, mode=Mode.PRIVATE)
    add(fillet4_3_piece_1, mode=Mode.SUBTRACT)
    with BuildSketch(Plane(origin=(59.69, 43.18, 5.08), x_dir=(0, 1, 0), z_dir=(0, 0, 1))) as fillet4_3_piece_2_section:
        Polygon((0, 0), (FILLET4_R, 0), (FILLET4_R, -FILLET4_R), (0, -FILLET4_R), align=None)
    fillet4_3_piece_2 = extrude(amount=FILLET4_R, mode=Mode.PRIVATE)
    fillet4_3_piece_2 = fillet4_3_piece_2 - Plane(origin=(59.69, 43.18, 5.08), x_dir=(-0.7071067811865475, -0.7071067811865475, 0), z_dir=(0, 0, 1)) * Sphere(FILLET4_R, mode=Mode.PRIVATE)
    add(fillet4_3_piece_2, mode=Mode.SUBTRACT)
    with BuildSketch(Plane(origin=(8.255, -17.78, 35.56), x_dir=(1, 0, 0), z_dir=(0, -1, 0))) as fillet4_3_piece_3_section:
        Polygon((0, 0), (FILLET4_R, 0), (FILLET4_R, FILLET4_R), (0, FILLET4_R), align=None)
    fillet4_3_piece_3 = extrude(amount=FILLET4_R, mode=Mode.PRIVATE)
    fillet4_3_piece_3 = fillet4_3_piece_3 - Plane(origin=(8.255, -17.78, 35.56), x_dir=(-0.7071067811865475, 0, -0.7071067811865477), z_dir=(0, -1, 0)) * Sphere(FILLET4_R, mode=Mode.PRIVATE)
    add(fillet4_3_piece_3, mode=Mode.SUBTRACT)
    with BuildSketch(Plane(origin=(24.13, 43.18, 35.56), x_dir=(1, 0, 0), z_dir=(0, 1, 0))) as fillet4_3_piece_4_section:
        Polygon((0, 0), (FILLET4_R, 0), (FILLET4_R, -FILLET4_R), (0, -FILLET4_R), align=None)
    fillet4_3_piece_4 = extrude(amount=FILLET4_R, mode=Mode.PRIVATE)
    fillet4_3_piece_4 = fillet4_3_piece_4 - Plane(origin=(24.13, 43.18, 35.56), x_dir=(-0.7071067811865475, 0, -0.7071067811865475), z_dir=(0, 1, 0)) * Sphere(FILLET4_R, mode=Mode.PRIVATE)
    add(fillet4_3_piece_4, mode=Mode.SUBTRACT)
    with BuildSketch(Plane(origin=(20.32, 43.18, 35.56), x_dir=(-1, 0, 0), z_dir=(0, 1, 0))) as fillet4_3_piece_5_section:
        Polygon((0, 0), (FILLET4_R, 0), (FILLET4_R, FILLET4_R), (0, FILLET4_R), align=None)
    fillet4_3_piece_5 = extrude(amount=FILLET4_R, mode=Mode.PRIVATE)
    fillet4_3_piece_5 = fillet4_3_piece_5 - Plane(origin=(20.32, 43.18, 35.56), x_dir=(0.7071067811865475, 0, -0.7071067811865475), z_dir=(0, 1, 0)) * Sphere(FILLET4_R, mode=Mode.PRIVATE)
    add(fillet4_3_piece_5, mode=Mode.SUBTRACT)
    with BuildSketch(Plane(origin=(8.255, 43.18, 35.56), x_dir=(1, 0, 0), z_dir=(0, 1, 0))) as fillet4_3_piece_6_section:
        Polygon((0, 0), (FILLET4_R, 0), (FILLET4_R, -FILLET4_R), (0, -FILLET4_R), align=None)
    fillet4_3_piece_6 = extrude(amount=FILLET4_R, mode=Mode.PRIVATE)
    fillet4_3_piece_6 = fillet4_3_piece_6 - Plane(origin=(8.255, 43.18, 35.56), x_dir=(-0.7071067811865475, 0, -0.7071067811865477), z_dir=(0, 1, 0)) * Sphere(FILLET4_R, mode=Mode.PRIVATE)
    add(fillet4_3_piece_6, mode=Mode.SUBTRACT)
    with BuildSketch(Plane(origin=(9.525, 44.45, 7.62), x_dir=(-1, 0, 0), z_dir=(0, 0, 1)), Plane(origin=(25.4, 44.45, 7.62), x_dir=(-1, 0, 0), z_dir=(0, 0, 1)), Plane(origin=(9.525, -19.05, 35.56), x_dir=(-1, 0, 0), z_dir=(0, 0, -1))) as fillet4_3_piece_7:
        with BuildLine():
            CenterArc((FILLET4_R, FILLET4_R), FILLET4_R, 180, 90)
            Line((0, FILLET4_R), (0, 0))
            Line((0, 0), (FILLET4_R, 0))
        make_face()
    extrude(amount=27.94, mode=Mode.SUBTRACT)
    with BuildSketch(Plane(origin=(19.05, 44.45, 7.62), x_dir=(1, 0, 0), z_dir=(0, 0, 1))) as fillet4_3_piece_8:
        with BuildLine():
            CenterArc((FILLET4_R, -FILLET4_R), FILLET4_R, 90, 90)
            Line((0, -FILLET4_R), (0, 0))
            Line((0, 0), (FILLET4_R, 0))
        make_face()
    extrude(amount=27.94, mode=Mode.SUBTRACT)
    with BuildSketch(Plane(origin=(10.795, -19.05, 6.35), x_dir=(0, 1, 0), z_dir=(1, 0, 0))) as fillet4_3_piece_9:
        with BuildLine():
            CenterArc((FILLET4_R, -FILLET4_R), FILLET4_R, 90, 90)
            Line((0, -FILLET4_R), (0, 0))
            Line((0, 0), (FILLET4_R, 0))
        make_face()
    extrude(amount=28.696927456, mode=Mode.SUBTRACT)
    with BuildSketch(Plane(origin=(17.78, 44.45, 6.35), x_dir=(0, -1, 0), z_dir=(-1, 0, 0))) as fillet4_3_piece_10:
        with BuildLine():
            CenterArc((FILLET4_R, -FILLET4_R), FILLET4_R, 90, 90)
            Line((0, -FILLET4_R), (0, 0))
            Line((0, 0), (FILLET4_R, 0))
        make_face()
    extrude(amount=6.985, mode=Mode.SUBTRACT)
    with BuildSketch(Plane(origin=(59.69, 44.45, 6.35), x_dir=(0, -1, 0), z_dir=(-1, 0, 0))) as fillet4_3_piece_11:
        with BuildLine():
            CenterArc((FILLET4_R, -FILLET4_R), FILLET4_R, 90, 90)
            Line((0, -FILLET4_R), (0, 0))
            Line((0, 0), (FILLET4_R, 0))
        make_face()
    extrude(amount=33.02, mode=Mode.SUBTRACT)
    with BuildSketch(Plane(origin=(42.031927456, 0, 6.35), x_dir=(0, 1, 0), z_dir=(1, 0, 0))) as fillet4_3_piece_12:
        with BuildLine():
            CenterArc((FILLET4_R, -FILLET4_R), FILLET4_R, 90, 90)
            Line((0, -FILLET4_R), (0, 0))
            Line((0, 0), (FILLET4_R, 0))
        make_face()
    extrude(amount=17.658072544, mode=Mode.SUBTRACT)
    with BuildSketch(Plane(origin=(40.761927456, -1.27, 6.35), x_dir=(-1, 0, 0), z_dir=(0, -1, 0))) as fillet4_3_piece_13:
        with BuildLine():
            CenterArc((FILLET4_R, FILLET4_R), FILLET4_R, 180, 90)
            Line((0, FILLET4_R), (0, 0))
            Line((0, 0), (FILLET4_R, 0))
        make_face()
    extrude(amount=16.51, mode=Mode.SUBTRACT)
    with BuildSketch(Plane(origin=(42.031927456, -1.27, 6.35), x_dir=(0, 1, 0), z_dir=(1, 0, 0))) as fillet4_3_piece_14:
        with BuildLine():
            CenterArc((1.27 + FILLET4_R, -FILLET4_R), FILLET4_R, 90, 90)
            Line((1.27, -FILLET4_R), (1.27, 0))
            Line((1.27, 0), (1.27 + FILLET4_R, 0))
        make_face()
    revolve(axis=Axis((42.031927456, -1.27, 6.35), (0, 0, 1)), revolution_arc=90, mode=Mode.SUBTRACT)
    with BuildSketch(Plane(origin=(39.491927456, -17.78, 6.35), x_dir=(0, -1, 0), z_dir=(-1, 0, 0))) as fillet4_3_piece_15:
        with BuildLine():
            CenterArc((1.27 - FILLET4_R, -FILLET4_R), FILLET4_R, 0, 90)
            Line((1.27, -FILLET4_R), (1.27, 0))
            Line((1.27, 0), (1.27 - FILLET4_R, 0))
        make_face()
    revolve(axis=Axis((39.491927456, -17.78, 6.35), (0, 0, 1)), revolution_arc=90, mode=Mode.SUBTRACT)
    with BuildSketch(Plane(origin=(26.67, 44.45, 7.62), x_dir=(0, 0, -1), z_dir=(1, 0, 0))) as fillet4_3_piece_16:
        with BuildLine():
            CenterArc((1.27 + FILLET4_R, -FILLET4_R), FILLET4_R, 90, 90)
            Line((1.27 + FILLET4_R, 0), (1.27, 0))
            Line((1.27, 0), (1.27, -FILLET4_R))
        make_face()
    revolve(axis=Axis((26.67, 44.45, 7.62), (0, 1, 0)), revolution_arc=90, mode=Mode.SUBTRACT)
    with BuildSketch(Plane(origin=(17.78, 44.45, 7.62), x_dir=(0, 0, -1), z_dir=(-1, 0, 0))) as fillet4_3_piece_17:
        with BuildLine():
            CenterArc((1.27 + FILLET4_R, FILLET4_R), FILLET4_R, 180, 90)
            Line((1.27, FILLET4_R), (1.27, 0))
            Line((1.27, 0), (1.27 + FILLET4_R, 0))
        make_face()
    revolve(axis=Axis((17.78, 44.45, 7.62), (0, -1, 0)), revolution_arc=90, mode=Mode.SUBTRACT)
    with BuildSketch(Plane(origin=(10.795, 44.45, 7.62), x_dir=(0, 0, -1), z_dir=(1, 0, 0))) as fillet4_3_piece_18:
        with BuildLine():
            CenterArc((1.27 + FILLET4_R, -FILLET4_R), FILLET4_R, 90, 90)
            Line((1.27, -FILLET4_R), (1.27, 0))
            Line((1.27, 0), (1.27 + FILLET4_R, 0))
        make_face()
    revolve(axis=Axis((10.795, 44.45, 7.62), (0, 1, 0)), revolution_arc=90, mode=Mode.SUBTRACT)
    with BuildSketch(Plane(origin=(10.795, -19.05, 7.62), x_dir=(0, 0, -1), z_dir=(1, 0, 0))) as fillet4_3_piece_19:
        with BuildLine():
            CenterArc((1.27 + FILLET4_R, FILLET4_R), FILLET4_R, 180, 90)
            Line((1.27, FILLET4_R), (1.27, 0))
            Line((1.27, 0), (1.27 + FILLET4_R, 0))
        make_face()
    revolve(axis=Axis((10.795, -19.05, 7.62), (0, 1, 0)), revolution_arc=90, mode=Mode.SUBTRACT)


solid = part.part
